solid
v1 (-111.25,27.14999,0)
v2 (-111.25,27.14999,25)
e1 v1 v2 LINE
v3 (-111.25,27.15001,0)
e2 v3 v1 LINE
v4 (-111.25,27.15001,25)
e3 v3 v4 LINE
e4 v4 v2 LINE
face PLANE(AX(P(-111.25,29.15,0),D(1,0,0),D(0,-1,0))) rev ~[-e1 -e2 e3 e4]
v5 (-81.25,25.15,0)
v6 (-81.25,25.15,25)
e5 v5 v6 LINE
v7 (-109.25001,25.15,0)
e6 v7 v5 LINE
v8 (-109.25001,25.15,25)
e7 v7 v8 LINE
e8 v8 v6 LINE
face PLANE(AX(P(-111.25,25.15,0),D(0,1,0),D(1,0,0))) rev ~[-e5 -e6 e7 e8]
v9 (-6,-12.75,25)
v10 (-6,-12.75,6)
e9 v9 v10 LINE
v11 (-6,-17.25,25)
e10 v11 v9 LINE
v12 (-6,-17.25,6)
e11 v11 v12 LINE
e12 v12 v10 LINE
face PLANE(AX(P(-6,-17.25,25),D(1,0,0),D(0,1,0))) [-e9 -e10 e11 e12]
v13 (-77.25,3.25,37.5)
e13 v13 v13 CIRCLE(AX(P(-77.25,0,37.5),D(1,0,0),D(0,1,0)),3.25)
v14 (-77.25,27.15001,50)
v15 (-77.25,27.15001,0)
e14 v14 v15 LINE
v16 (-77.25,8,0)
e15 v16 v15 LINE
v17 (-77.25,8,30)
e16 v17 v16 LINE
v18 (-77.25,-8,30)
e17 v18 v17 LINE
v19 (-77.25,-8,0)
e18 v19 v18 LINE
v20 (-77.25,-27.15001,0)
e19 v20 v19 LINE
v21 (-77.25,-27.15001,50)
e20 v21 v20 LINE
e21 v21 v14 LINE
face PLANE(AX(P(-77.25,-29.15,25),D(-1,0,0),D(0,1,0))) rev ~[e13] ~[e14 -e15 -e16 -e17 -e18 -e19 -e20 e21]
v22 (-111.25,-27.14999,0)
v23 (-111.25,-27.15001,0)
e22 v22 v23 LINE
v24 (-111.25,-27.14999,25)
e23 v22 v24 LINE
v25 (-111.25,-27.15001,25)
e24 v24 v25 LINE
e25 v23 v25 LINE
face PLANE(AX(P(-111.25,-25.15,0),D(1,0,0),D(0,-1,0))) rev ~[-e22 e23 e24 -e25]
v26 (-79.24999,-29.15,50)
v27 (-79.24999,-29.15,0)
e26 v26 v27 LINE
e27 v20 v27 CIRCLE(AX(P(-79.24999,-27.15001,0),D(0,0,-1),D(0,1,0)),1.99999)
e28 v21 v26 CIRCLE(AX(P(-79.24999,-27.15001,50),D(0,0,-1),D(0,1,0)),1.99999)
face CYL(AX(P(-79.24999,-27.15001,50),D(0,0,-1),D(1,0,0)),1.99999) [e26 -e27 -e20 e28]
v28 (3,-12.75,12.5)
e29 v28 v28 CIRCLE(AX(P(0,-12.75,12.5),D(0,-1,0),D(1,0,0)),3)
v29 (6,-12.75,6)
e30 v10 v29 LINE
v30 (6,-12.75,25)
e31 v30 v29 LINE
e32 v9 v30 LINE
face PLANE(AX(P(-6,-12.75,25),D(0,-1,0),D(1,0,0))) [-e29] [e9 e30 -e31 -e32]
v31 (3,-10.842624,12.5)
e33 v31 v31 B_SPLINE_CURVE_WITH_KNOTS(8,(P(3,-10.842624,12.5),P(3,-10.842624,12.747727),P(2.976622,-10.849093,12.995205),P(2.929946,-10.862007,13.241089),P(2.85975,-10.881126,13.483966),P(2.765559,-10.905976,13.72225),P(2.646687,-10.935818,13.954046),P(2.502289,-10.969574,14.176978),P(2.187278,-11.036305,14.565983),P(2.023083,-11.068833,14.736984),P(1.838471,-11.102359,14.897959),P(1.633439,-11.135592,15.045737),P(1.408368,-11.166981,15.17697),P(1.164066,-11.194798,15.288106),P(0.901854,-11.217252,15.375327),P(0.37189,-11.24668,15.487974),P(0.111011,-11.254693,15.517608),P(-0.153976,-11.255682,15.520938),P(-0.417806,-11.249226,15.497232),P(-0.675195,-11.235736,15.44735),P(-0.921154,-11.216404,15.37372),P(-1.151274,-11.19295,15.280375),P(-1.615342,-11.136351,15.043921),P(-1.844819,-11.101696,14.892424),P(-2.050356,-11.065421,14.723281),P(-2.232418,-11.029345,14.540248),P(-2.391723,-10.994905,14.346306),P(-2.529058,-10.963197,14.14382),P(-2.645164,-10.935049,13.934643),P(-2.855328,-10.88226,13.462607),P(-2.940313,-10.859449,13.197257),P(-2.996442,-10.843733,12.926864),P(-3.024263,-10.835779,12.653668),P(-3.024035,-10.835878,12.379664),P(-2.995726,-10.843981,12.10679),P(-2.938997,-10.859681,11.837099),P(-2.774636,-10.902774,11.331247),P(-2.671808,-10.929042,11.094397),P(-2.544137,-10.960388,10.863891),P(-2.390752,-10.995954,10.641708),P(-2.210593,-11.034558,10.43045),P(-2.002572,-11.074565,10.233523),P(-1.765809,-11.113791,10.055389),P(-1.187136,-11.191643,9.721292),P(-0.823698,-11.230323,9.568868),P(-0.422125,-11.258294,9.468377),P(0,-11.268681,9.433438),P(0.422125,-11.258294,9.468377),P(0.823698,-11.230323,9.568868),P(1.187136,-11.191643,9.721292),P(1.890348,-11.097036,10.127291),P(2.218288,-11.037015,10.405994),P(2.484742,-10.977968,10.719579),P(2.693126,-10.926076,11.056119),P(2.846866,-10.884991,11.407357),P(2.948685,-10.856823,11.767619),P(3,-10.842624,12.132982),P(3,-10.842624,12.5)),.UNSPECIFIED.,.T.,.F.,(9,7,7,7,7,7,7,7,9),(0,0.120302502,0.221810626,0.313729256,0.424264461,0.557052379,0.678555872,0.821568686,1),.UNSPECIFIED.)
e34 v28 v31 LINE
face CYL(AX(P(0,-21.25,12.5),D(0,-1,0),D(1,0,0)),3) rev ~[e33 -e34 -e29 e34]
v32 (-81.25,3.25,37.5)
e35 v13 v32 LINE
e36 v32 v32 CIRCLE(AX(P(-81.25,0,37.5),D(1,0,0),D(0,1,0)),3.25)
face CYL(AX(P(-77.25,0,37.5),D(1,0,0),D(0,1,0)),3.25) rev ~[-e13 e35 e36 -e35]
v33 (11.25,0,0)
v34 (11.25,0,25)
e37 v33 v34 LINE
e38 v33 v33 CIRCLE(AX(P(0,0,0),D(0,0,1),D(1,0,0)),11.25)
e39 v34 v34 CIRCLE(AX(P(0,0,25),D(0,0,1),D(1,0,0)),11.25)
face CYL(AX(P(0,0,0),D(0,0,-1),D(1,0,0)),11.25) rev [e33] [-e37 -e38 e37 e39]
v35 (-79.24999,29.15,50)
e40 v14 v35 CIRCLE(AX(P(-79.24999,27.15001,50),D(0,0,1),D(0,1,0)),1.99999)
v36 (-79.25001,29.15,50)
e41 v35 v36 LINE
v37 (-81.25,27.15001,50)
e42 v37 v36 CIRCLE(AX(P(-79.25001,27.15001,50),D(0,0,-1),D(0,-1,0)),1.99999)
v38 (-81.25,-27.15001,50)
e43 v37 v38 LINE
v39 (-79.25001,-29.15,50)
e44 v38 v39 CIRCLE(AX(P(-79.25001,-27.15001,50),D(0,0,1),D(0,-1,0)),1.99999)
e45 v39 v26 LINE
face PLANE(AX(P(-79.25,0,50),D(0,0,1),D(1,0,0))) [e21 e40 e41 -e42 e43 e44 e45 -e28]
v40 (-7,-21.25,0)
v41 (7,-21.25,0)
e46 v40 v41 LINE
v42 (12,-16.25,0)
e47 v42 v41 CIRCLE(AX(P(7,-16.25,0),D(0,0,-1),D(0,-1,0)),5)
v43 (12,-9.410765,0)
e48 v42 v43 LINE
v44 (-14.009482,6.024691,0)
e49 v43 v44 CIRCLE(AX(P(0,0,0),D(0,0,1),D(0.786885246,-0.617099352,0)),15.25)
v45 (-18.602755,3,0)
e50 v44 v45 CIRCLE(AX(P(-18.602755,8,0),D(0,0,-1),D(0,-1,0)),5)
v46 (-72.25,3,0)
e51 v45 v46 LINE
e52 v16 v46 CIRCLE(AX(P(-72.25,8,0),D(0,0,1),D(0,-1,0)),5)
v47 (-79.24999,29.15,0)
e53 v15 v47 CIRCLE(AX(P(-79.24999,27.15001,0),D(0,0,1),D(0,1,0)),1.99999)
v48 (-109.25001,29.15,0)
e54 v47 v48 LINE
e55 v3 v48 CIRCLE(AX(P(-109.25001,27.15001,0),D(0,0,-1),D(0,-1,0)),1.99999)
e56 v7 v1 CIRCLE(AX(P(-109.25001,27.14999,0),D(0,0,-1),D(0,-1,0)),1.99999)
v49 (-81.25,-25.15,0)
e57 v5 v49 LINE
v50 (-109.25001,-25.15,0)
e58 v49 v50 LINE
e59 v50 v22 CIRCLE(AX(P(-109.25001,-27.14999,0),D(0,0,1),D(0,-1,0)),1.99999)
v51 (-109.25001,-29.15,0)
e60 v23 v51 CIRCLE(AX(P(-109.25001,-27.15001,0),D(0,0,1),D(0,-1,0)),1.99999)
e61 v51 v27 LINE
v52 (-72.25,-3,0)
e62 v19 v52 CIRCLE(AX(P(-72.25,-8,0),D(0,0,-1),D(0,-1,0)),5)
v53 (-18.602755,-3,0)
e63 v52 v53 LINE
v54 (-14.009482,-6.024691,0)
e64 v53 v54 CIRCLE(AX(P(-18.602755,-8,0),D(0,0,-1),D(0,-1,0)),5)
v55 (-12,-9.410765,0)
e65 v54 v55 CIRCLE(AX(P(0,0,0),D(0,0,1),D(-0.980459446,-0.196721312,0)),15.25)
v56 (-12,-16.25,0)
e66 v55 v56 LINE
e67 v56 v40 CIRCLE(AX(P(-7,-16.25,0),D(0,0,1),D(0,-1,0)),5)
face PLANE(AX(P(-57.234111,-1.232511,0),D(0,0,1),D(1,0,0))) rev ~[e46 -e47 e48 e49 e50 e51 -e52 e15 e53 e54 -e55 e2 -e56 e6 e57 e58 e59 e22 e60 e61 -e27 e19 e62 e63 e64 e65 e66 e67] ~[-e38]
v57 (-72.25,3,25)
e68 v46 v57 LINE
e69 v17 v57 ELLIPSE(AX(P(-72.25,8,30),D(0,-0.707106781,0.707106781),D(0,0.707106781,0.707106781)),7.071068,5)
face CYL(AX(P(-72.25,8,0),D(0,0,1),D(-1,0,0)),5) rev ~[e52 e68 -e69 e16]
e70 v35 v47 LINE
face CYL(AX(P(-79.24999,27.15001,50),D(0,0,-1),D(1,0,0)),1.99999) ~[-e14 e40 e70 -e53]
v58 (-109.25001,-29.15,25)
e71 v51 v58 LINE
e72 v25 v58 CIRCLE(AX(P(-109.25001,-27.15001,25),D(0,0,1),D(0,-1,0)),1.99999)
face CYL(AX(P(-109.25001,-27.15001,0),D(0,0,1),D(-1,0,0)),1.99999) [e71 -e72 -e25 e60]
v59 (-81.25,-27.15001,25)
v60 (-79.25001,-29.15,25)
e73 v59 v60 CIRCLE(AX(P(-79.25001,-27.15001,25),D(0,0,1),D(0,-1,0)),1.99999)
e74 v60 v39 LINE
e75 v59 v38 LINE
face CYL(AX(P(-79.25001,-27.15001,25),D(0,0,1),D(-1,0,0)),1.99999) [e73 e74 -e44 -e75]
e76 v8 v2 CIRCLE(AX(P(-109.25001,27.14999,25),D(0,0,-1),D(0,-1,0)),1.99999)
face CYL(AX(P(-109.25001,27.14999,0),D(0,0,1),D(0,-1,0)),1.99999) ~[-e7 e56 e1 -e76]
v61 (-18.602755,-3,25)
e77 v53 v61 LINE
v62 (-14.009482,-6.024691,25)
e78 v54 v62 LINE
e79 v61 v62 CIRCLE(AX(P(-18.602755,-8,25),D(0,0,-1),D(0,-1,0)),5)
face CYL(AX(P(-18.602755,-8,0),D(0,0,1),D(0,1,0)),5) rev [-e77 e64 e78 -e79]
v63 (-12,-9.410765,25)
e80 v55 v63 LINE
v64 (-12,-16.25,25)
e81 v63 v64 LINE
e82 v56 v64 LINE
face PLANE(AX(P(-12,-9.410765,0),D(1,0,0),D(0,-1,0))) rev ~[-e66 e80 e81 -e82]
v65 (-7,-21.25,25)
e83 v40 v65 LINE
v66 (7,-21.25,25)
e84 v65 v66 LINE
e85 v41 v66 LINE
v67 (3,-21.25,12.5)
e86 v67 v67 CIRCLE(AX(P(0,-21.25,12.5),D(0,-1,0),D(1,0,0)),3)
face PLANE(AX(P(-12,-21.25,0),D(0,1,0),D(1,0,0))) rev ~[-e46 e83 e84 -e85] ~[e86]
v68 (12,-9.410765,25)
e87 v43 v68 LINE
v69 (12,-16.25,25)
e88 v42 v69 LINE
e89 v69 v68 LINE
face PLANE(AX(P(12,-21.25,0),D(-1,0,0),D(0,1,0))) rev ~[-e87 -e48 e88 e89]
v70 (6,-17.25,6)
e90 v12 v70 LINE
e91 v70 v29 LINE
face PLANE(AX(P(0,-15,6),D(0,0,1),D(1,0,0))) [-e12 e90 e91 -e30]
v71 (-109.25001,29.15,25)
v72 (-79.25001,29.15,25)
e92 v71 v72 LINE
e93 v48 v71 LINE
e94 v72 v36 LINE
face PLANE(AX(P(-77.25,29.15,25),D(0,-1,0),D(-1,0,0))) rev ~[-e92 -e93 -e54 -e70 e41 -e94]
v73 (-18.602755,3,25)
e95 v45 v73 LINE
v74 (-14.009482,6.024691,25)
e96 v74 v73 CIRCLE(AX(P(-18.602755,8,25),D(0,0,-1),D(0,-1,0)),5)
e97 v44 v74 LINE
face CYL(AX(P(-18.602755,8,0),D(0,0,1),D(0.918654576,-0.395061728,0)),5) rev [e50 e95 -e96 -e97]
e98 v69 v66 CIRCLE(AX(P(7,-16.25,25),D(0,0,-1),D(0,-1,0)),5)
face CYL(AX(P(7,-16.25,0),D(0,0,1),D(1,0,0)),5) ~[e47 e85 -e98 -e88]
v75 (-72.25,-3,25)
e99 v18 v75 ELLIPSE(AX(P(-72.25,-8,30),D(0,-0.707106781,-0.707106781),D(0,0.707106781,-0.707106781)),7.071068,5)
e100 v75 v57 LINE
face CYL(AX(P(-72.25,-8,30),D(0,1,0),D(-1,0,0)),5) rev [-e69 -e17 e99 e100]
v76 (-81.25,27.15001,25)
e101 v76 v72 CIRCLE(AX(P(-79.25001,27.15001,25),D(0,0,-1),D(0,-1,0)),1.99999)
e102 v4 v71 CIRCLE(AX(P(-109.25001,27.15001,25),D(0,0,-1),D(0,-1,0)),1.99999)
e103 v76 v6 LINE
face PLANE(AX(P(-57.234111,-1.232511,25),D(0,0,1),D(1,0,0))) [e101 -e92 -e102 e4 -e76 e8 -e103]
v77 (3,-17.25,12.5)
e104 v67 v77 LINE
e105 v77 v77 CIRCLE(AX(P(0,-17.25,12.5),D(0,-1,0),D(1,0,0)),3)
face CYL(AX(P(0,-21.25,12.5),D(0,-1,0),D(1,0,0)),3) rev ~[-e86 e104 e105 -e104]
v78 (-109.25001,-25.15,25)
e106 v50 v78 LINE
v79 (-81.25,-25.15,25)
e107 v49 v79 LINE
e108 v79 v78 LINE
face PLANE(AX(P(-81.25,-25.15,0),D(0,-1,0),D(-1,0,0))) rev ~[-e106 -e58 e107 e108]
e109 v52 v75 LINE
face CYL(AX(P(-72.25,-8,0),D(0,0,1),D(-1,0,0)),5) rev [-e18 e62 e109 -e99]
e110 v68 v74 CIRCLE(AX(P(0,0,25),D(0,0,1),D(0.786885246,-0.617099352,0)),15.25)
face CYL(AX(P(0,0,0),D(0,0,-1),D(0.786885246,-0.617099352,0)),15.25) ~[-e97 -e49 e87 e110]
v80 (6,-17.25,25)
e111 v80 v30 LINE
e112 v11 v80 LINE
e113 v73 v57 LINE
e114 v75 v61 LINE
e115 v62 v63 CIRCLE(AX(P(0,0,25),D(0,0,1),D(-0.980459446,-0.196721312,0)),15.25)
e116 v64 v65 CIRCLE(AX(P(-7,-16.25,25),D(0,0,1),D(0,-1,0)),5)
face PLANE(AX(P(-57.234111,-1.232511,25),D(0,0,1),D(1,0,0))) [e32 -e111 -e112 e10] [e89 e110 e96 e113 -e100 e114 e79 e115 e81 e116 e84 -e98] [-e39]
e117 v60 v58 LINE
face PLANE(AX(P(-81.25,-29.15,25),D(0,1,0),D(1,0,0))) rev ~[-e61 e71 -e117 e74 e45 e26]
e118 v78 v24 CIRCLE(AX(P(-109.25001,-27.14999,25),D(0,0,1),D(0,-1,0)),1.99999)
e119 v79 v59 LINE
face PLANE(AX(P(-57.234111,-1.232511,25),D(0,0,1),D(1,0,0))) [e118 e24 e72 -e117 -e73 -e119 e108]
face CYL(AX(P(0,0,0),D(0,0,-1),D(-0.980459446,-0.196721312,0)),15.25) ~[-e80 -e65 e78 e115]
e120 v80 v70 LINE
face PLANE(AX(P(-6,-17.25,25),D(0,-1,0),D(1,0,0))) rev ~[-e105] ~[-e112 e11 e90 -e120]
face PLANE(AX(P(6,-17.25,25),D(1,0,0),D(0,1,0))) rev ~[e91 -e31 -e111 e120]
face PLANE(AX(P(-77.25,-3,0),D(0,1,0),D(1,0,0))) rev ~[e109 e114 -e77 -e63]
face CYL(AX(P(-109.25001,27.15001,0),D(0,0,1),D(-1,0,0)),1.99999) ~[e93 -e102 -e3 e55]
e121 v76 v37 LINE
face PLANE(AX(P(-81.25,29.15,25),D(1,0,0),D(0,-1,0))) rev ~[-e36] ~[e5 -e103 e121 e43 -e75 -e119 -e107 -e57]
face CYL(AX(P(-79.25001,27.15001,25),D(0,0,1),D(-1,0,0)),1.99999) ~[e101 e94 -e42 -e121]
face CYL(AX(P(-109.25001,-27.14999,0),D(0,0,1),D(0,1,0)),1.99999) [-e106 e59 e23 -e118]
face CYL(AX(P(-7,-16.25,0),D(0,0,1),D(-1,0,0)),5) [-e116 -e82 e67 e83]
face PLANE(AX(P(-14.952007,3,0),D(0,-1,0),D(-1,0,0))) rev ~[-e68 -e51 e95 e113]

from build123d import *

# Parameters (mm, degrees)
F0_R     = 11.25
F1_DEPTH = 25
F3_DEPTH = 25
F4_R     = 3.25
F5_DEPTH = 4
F6_W     = 12
F6_H     = 4.5
F7_DEPTH = 19
F8_R     = 3
F9_DEPTH = 12
F10_R    = 5
F11_R    = 5
F12_R    = 1.99999


# Not quite as in the source:
# - a fillet or chamfer is up to 0.001 mm smaller than in the source, because OpenCascade refuses the exact size


with BuildPart() as f1:
    # F0 (on Top) → F1 (new body)
    with BuildSketch(Plane.XY):
        with BuildLine():
            Line((-81.25, 25.15), (-81.25, -25.15))
            Line((-81.25, -25.15), (-111.25, -25.15))
            Line((-111.25, -25.15), (-111.25, -29.15))
            Line((-111.25, -29.15), (-77.25, -29.15))
            Line((-77.25, -29.15), (-77.25, -3))
            Line((-77.25, -3), (-14.9520065543, -3))
            ThreePointArc((-14.9520065543, -3), (-13.8519724825, -6.3785075325), (-12, -9.4107651124))
            Line((-12, -9.4107651124), (-12, -12.3110722522))
            Line((-12, -12.3110722522), (-12, -21.25))
            Line((-12, -21.25), (-9, -21.25))
            Line((-9, -21.25), (9, -21.25))
            Line((9, -21.25), (12, -21.25))
            Line((12, -21.25), (12, -12.3110722522))
            Line((12, -12.3110722522), (12, -9.4107651124))
            ThreePointArc((12, -9.4107651124), (6.3785075325, 13.8519724825), (-14.9520065543, 3))
            Line((-14.9520065543, 3), (-77.25, 3))
            Line((-77.25, 3), (-77.25, 29.15))
            Line((-77.25, 29.15), (-111.25, 29.15))
            Line((-111.25, 29.15), (-111.25, 25.15))
            Line((-111.25, 25.15), (-81.25, 25.15))
        make_face()
        Circle(F0_R, mode=Mode.SUBTRACT)
    extrude(amount=F1_DEPTH)

    # F2 (on face) → F3 (join)
    with BuildSketch(Plane.XY.offset(25)):
        Polygon((-77.25, 3), (-77.25, 29.15), (-81.25, 29.15), (-81.25, 25.15), (-81.25, -25.15), (-81.25, -29.15), (-77.25, -29.15), (-77.25, -3), align=None)
    extrude(amount=F3_DEPTH)

    # F4 (on face) → F5 (cut)
    with BuildSketch(Plane.YZ.offset(-77.25)):
        with Locations((0, 37.5)):
            Circle(F4_R)
    extrude(amount=-F5_DEPTH, mode=Mode.SUBTRACT)

    # F6 (on face) → F7 (cut)
    with BuildSketch(Plane.XY.offset(25)):
        with Locations((0, -15)):
            Rectangle(F6_W, F6_H)
    extrude(amount=-F7_DEPTH, mode=Mode.SUBTRACT)

    # F8 (on face) → F9 (cut)
    with BuildSketch(Plane.XZ.offset(21.25)):
        with Locations((0, 12.5)):
            Circle(F8_R)
    extrude(amount=-F9_DEPTH, mode=Mode.SUBTRACT)

    # F10
    f10_edges = [f1.edges().sort_by_distance(p)[0] for p in [
        (12, -21.25, 12.5),
        (-12, -21.25, 12.5),
        (-77.25, -3, 12.5),
        (-77.25, 3, 12.5),
    ]]
    fillet(f10_edges, radius=F10_R)

    # F11
    f11_edges = [f1.edges().sort_by_distance(p)[0] for p in [
        (-14.952007, 3, 12.5),
        (-14.952007, -3, 12.5),
        (-77.25, 0, 25),
    ]]
    fillet(f11_edges, radius=F11_R)

    # F12 (radius 2 in the source; OpenCascade refuses exactly that, so slightly less here)
    f12_edges = [f1.edges().sort_by_distance(p)[0] for p in [
        (-111.25, 29.15, 12.5),
        (-111.25, -25.15, 12.5),
        (-111.25, -29.15, 12.5),
        (-111.25, 25.15, 12.5),
        (-77.25, 29.15, 25),
        (-81.25, 29.15, 37.5),
        (-77.25, -29.15, 25),
        (-81.25, -29.15, 37.5),
    ]]
    fillet(f12_edges, radius=F12_R)


solid = f1.part
